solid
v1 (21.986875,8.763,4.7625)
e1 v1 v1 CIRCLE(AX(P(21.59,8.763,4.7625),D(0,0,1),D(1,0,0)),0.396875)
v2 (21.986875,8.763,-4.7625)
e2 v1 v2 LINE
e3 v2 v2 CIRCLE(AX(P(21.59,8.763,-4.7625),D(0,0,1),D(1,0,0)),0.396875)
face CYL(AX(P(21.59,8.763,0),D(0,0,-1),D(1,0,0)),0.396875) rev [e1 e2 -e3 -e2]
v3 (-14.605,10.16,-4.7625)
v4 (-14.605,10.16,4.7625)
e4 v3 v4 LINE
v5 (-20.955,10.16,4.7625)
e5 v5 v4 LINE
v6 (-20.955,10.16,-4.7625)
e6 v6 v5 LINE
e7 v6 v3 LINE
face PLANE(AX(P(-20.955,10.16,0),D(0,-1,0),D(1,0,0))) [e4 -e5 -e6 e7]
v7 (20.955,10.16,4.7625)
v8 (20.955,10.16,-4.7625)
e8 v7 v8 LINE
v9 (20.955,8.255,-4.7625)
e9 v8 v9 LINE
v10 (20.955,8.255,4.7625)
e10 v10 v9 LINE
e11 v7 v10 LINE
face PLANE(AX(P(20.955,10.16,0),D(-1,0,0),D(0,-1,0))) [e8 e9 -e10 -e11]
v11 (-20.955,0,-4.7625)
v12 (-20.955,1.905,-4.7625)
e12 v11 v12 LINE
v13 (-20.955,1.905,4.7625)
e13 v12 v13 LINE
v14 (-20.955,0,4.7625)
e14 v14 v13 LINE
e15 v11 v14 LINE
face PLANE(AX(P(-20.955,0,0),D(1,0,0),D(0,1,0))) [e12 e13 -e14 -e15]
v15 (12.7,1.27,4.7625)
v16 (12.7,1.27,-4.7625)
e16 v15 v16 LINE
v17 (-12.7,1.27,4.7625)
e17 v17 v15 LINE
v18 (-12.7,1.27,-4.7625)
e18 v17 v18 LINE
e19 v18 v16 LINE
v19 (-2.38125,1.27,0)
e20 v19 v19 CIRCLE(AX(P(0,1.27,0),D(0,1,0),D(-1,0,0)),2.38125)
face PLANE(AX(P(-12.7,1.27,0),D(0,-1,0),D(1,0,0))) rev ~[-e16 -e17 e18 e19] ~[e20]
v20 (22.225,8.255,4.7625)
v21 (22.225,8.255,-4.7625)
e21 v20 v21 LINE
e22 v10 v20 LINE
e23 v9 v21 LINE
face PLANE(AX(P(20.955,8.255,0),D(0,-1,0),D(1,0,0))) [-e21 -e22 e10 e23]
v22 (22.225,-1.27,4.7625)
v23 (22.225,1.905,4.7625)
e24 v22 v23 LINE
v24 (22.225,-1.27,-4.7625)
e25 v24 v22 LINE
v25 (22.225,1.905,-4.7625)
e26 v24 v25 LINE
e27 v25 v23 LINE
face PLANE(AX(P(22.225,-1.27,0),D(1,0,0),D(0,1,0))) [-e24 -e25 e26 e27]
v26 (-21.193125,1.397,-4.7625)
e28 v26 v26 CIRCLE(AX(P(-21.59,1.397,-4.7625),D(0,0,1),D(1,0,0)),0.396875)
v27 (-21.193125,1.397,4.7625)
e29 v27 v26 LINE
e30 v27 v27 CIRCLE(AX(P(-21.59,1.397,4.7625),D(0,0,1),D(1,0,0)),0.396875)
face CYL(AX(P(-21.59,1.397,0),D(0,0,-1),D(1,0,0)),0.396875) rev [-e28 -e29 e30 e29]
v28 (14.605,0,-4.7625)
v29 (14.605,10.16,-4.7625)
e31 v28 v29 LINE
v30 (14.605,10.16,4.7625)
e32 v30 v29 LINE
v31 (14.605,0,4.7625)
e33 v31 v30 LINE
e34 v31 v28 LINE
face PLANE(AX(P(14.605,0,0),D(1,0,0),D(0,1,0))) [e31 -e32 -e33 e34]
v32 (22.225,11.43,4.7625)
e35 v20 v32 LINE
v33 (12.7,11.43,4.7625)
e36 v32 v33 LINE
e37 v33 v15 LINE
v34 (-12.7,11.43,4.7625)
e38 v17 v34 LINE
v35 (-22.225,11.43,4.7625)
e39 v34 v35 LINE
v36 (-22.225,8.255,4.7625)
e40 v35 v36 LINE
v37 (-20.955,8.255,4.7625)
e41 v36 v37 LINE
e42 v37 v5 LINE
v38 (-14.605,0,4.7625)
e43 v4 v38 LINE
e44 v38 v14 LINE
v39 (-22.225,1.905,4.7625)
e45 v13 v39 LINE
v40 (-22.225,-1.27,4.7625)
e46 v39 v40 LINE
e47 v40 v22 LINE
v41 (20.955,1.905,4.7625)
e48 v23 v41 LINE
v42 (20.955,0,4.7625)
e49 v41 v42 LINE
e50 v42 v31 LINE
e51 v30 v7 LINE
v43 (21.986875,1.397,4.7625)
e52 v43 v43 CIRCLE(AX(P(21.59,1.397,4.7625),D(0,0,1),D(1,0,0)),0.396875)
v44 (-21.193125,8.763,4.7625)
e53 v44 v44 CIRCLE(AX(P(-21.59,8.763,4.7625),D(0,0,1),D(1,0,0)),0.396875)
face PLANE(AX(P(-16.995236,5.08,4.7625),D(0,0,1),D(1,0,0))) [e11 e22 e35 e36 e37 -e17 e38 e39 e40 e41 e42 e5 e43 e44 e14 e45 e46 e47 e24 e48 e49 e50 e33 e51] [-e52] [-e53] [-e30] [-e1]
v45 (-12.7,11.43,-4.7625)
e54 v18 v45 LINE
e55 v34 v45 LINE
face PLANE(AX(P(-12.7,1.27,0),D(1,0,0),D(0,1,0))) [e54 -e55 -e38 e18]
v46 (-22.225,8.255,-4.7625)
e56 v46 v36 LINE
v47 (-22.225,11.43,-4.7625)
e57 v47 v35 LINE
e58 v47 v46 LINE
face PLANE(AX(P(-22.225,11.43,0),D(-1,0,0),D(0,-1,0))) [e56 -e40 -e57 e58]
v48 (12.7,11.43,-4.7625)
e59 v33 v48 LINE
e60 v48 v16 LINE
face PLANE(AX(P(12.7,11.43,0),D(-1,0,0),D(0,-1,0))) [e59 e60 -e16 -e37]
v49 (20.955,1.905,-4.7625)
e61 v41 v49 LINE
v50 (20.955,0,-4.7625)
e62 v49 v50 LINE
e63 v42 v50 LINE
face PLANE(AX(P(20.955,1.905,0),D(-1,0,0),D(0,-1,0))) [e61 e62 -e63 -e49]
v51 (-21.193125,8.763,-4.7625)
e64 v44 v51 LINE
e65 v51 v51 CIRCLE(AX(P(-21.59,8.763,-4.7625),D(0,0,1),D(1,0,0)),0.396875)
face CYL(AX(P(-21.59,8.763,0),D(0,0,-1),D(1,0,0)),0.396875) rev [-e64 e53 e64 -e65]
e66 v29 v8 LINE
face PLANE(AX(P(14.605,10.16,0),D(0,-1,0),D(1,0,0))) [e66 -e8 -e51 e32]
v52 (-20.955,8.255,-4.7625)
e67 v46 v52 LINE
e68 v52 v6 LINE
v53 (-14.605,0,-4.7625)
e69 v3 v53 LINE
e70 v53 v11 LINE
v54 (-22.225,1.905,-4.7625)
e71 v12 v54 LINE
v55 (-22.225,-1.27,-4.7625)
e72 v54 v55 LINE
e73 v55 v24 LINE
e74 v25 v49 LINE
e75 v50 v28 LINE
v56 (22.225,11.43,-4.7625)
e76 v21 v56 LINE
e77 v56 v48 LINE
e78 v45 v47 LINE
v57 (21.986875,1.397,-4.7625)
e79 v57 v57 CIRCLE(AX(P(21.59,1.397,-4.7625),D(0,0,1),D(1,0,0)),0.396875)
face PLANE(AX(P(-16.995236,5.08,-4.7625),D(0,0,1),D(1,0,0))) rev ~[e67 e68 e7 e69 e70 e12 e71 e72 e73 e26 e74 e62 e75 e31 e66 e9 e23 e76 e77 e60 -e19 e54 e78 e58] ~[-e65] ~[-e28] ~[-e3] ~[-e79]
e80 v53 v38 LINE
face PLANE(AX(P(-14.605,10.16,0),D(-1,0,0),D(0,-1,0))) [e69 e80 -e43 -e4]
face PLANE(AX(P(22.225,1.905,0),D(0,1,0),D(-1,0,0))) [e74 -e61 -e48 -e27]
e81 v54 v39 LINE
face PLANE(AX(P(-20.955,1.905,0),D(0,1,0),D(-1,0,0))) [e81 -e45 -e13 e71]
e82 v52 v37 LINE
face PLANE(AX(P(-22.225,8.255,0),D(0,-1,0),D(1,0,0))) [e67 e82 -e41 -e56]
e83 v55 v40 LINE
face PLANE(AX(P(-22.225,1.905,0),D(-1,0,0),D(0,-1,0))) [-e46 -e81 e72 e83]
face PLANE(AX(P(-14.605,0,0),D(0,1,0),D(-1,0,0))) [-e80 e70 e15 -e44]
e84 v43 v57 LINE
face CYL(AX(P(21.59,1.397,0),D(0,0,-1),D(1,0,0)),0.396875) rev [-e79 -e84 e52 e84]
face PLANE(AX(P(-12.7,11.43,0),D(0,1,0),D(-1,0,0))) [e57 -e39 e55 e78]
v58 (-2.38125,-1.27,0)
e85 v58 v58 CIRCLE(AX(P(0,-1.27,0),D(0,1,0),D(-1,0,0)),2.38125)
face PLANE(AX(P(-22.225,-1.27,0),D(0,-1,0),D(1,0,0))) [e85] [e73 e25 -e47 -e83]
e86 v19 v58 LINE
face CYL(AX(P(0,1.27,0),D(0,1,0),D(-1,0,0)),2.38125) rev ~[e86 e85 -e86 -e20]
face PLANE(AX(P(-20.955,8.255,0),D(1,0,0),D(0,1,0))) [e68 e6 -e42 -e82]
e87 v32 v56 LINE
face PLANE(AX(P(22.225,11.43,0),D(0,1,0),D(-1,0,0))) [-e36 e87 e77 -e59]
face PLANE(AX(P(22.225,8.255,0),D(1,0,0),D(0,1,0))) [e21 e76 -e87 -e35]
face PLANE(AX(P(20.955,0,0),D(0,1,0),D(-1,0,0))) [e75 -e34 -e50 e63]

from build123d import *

# Parameters (mm, degrees)
F0_R     = 0.396875
F0_W     = 25.4
F0_H     = 2.54
F1_DEPTH = 4.7625
F2_R     = 2.38125
F3_DEPTH = 5.969


# Not quite as in the source:
# - a length typed as a fraction of an inch, garbled in the dataset ("3 / 203.2 mm" for 3/8 in), is restored
# - a feature names something its author has since deleted; it is built from what else it names


with BuildPart() as f1:
    # F0 (on Top) → F1 (new body, symmetric)
    with BuildSketch(Plane.XY):
        Polygon((-12.7, 11.43), (-22.225, 11.43), (-22.225, 8.255), (-20.955, 8.255), (-20.955, 10.16), (-14.605, 10.16), (-14.605, 0), (-20.955, 0), (-20.955, 1.905), (-22.225, 1.905), (-22.225, -1.27), (-12.7, -1.27), (-12.7, 1.27), align=None)
        with Locations((-21.59, 1.397)):
            Circle(F0_R, mode=Mode.SUBTRACT)
        with Locations((-21.59, 8.763)):
            Circle(F0_R, mode=Mode.SUBTRACT)
        Rectangle(F0_W, F0_H)
        Polygon((12.7, 11.43), (12.7, 1.27), (12.7, -1.27), (22.225, -1.27), (22.225, 1.905), (20.955, 1.905), (20.955, 0), (14.605, 0), (14.605, 10.16), (20.955, 10.16), (20.955, 8.255), (22.225, 8.255), (22.225, 11.43), align=None)
        with Locations((21.59, 1.397)):
            Circle(F0_R, mode=Mode.SUBTRACT)
        with Locations((21.59, 8.763)):
            Circle(F0_R, mode=Mode.SUBTRACT)
    extrude(amount=F1_DEPTH, both=True)

    # F2 (on face) → F3 (cut)
    with BuildSketch(Plane(origin=(0, 1.27, 0), x_dir=(-1, 0, 0), z_dir=(0, 1, 0))):
        Circle(F2_R)
    extrude(amount=-F3_DEPTH, mode=Mode.SUBTRACT)


solid = f1.part
